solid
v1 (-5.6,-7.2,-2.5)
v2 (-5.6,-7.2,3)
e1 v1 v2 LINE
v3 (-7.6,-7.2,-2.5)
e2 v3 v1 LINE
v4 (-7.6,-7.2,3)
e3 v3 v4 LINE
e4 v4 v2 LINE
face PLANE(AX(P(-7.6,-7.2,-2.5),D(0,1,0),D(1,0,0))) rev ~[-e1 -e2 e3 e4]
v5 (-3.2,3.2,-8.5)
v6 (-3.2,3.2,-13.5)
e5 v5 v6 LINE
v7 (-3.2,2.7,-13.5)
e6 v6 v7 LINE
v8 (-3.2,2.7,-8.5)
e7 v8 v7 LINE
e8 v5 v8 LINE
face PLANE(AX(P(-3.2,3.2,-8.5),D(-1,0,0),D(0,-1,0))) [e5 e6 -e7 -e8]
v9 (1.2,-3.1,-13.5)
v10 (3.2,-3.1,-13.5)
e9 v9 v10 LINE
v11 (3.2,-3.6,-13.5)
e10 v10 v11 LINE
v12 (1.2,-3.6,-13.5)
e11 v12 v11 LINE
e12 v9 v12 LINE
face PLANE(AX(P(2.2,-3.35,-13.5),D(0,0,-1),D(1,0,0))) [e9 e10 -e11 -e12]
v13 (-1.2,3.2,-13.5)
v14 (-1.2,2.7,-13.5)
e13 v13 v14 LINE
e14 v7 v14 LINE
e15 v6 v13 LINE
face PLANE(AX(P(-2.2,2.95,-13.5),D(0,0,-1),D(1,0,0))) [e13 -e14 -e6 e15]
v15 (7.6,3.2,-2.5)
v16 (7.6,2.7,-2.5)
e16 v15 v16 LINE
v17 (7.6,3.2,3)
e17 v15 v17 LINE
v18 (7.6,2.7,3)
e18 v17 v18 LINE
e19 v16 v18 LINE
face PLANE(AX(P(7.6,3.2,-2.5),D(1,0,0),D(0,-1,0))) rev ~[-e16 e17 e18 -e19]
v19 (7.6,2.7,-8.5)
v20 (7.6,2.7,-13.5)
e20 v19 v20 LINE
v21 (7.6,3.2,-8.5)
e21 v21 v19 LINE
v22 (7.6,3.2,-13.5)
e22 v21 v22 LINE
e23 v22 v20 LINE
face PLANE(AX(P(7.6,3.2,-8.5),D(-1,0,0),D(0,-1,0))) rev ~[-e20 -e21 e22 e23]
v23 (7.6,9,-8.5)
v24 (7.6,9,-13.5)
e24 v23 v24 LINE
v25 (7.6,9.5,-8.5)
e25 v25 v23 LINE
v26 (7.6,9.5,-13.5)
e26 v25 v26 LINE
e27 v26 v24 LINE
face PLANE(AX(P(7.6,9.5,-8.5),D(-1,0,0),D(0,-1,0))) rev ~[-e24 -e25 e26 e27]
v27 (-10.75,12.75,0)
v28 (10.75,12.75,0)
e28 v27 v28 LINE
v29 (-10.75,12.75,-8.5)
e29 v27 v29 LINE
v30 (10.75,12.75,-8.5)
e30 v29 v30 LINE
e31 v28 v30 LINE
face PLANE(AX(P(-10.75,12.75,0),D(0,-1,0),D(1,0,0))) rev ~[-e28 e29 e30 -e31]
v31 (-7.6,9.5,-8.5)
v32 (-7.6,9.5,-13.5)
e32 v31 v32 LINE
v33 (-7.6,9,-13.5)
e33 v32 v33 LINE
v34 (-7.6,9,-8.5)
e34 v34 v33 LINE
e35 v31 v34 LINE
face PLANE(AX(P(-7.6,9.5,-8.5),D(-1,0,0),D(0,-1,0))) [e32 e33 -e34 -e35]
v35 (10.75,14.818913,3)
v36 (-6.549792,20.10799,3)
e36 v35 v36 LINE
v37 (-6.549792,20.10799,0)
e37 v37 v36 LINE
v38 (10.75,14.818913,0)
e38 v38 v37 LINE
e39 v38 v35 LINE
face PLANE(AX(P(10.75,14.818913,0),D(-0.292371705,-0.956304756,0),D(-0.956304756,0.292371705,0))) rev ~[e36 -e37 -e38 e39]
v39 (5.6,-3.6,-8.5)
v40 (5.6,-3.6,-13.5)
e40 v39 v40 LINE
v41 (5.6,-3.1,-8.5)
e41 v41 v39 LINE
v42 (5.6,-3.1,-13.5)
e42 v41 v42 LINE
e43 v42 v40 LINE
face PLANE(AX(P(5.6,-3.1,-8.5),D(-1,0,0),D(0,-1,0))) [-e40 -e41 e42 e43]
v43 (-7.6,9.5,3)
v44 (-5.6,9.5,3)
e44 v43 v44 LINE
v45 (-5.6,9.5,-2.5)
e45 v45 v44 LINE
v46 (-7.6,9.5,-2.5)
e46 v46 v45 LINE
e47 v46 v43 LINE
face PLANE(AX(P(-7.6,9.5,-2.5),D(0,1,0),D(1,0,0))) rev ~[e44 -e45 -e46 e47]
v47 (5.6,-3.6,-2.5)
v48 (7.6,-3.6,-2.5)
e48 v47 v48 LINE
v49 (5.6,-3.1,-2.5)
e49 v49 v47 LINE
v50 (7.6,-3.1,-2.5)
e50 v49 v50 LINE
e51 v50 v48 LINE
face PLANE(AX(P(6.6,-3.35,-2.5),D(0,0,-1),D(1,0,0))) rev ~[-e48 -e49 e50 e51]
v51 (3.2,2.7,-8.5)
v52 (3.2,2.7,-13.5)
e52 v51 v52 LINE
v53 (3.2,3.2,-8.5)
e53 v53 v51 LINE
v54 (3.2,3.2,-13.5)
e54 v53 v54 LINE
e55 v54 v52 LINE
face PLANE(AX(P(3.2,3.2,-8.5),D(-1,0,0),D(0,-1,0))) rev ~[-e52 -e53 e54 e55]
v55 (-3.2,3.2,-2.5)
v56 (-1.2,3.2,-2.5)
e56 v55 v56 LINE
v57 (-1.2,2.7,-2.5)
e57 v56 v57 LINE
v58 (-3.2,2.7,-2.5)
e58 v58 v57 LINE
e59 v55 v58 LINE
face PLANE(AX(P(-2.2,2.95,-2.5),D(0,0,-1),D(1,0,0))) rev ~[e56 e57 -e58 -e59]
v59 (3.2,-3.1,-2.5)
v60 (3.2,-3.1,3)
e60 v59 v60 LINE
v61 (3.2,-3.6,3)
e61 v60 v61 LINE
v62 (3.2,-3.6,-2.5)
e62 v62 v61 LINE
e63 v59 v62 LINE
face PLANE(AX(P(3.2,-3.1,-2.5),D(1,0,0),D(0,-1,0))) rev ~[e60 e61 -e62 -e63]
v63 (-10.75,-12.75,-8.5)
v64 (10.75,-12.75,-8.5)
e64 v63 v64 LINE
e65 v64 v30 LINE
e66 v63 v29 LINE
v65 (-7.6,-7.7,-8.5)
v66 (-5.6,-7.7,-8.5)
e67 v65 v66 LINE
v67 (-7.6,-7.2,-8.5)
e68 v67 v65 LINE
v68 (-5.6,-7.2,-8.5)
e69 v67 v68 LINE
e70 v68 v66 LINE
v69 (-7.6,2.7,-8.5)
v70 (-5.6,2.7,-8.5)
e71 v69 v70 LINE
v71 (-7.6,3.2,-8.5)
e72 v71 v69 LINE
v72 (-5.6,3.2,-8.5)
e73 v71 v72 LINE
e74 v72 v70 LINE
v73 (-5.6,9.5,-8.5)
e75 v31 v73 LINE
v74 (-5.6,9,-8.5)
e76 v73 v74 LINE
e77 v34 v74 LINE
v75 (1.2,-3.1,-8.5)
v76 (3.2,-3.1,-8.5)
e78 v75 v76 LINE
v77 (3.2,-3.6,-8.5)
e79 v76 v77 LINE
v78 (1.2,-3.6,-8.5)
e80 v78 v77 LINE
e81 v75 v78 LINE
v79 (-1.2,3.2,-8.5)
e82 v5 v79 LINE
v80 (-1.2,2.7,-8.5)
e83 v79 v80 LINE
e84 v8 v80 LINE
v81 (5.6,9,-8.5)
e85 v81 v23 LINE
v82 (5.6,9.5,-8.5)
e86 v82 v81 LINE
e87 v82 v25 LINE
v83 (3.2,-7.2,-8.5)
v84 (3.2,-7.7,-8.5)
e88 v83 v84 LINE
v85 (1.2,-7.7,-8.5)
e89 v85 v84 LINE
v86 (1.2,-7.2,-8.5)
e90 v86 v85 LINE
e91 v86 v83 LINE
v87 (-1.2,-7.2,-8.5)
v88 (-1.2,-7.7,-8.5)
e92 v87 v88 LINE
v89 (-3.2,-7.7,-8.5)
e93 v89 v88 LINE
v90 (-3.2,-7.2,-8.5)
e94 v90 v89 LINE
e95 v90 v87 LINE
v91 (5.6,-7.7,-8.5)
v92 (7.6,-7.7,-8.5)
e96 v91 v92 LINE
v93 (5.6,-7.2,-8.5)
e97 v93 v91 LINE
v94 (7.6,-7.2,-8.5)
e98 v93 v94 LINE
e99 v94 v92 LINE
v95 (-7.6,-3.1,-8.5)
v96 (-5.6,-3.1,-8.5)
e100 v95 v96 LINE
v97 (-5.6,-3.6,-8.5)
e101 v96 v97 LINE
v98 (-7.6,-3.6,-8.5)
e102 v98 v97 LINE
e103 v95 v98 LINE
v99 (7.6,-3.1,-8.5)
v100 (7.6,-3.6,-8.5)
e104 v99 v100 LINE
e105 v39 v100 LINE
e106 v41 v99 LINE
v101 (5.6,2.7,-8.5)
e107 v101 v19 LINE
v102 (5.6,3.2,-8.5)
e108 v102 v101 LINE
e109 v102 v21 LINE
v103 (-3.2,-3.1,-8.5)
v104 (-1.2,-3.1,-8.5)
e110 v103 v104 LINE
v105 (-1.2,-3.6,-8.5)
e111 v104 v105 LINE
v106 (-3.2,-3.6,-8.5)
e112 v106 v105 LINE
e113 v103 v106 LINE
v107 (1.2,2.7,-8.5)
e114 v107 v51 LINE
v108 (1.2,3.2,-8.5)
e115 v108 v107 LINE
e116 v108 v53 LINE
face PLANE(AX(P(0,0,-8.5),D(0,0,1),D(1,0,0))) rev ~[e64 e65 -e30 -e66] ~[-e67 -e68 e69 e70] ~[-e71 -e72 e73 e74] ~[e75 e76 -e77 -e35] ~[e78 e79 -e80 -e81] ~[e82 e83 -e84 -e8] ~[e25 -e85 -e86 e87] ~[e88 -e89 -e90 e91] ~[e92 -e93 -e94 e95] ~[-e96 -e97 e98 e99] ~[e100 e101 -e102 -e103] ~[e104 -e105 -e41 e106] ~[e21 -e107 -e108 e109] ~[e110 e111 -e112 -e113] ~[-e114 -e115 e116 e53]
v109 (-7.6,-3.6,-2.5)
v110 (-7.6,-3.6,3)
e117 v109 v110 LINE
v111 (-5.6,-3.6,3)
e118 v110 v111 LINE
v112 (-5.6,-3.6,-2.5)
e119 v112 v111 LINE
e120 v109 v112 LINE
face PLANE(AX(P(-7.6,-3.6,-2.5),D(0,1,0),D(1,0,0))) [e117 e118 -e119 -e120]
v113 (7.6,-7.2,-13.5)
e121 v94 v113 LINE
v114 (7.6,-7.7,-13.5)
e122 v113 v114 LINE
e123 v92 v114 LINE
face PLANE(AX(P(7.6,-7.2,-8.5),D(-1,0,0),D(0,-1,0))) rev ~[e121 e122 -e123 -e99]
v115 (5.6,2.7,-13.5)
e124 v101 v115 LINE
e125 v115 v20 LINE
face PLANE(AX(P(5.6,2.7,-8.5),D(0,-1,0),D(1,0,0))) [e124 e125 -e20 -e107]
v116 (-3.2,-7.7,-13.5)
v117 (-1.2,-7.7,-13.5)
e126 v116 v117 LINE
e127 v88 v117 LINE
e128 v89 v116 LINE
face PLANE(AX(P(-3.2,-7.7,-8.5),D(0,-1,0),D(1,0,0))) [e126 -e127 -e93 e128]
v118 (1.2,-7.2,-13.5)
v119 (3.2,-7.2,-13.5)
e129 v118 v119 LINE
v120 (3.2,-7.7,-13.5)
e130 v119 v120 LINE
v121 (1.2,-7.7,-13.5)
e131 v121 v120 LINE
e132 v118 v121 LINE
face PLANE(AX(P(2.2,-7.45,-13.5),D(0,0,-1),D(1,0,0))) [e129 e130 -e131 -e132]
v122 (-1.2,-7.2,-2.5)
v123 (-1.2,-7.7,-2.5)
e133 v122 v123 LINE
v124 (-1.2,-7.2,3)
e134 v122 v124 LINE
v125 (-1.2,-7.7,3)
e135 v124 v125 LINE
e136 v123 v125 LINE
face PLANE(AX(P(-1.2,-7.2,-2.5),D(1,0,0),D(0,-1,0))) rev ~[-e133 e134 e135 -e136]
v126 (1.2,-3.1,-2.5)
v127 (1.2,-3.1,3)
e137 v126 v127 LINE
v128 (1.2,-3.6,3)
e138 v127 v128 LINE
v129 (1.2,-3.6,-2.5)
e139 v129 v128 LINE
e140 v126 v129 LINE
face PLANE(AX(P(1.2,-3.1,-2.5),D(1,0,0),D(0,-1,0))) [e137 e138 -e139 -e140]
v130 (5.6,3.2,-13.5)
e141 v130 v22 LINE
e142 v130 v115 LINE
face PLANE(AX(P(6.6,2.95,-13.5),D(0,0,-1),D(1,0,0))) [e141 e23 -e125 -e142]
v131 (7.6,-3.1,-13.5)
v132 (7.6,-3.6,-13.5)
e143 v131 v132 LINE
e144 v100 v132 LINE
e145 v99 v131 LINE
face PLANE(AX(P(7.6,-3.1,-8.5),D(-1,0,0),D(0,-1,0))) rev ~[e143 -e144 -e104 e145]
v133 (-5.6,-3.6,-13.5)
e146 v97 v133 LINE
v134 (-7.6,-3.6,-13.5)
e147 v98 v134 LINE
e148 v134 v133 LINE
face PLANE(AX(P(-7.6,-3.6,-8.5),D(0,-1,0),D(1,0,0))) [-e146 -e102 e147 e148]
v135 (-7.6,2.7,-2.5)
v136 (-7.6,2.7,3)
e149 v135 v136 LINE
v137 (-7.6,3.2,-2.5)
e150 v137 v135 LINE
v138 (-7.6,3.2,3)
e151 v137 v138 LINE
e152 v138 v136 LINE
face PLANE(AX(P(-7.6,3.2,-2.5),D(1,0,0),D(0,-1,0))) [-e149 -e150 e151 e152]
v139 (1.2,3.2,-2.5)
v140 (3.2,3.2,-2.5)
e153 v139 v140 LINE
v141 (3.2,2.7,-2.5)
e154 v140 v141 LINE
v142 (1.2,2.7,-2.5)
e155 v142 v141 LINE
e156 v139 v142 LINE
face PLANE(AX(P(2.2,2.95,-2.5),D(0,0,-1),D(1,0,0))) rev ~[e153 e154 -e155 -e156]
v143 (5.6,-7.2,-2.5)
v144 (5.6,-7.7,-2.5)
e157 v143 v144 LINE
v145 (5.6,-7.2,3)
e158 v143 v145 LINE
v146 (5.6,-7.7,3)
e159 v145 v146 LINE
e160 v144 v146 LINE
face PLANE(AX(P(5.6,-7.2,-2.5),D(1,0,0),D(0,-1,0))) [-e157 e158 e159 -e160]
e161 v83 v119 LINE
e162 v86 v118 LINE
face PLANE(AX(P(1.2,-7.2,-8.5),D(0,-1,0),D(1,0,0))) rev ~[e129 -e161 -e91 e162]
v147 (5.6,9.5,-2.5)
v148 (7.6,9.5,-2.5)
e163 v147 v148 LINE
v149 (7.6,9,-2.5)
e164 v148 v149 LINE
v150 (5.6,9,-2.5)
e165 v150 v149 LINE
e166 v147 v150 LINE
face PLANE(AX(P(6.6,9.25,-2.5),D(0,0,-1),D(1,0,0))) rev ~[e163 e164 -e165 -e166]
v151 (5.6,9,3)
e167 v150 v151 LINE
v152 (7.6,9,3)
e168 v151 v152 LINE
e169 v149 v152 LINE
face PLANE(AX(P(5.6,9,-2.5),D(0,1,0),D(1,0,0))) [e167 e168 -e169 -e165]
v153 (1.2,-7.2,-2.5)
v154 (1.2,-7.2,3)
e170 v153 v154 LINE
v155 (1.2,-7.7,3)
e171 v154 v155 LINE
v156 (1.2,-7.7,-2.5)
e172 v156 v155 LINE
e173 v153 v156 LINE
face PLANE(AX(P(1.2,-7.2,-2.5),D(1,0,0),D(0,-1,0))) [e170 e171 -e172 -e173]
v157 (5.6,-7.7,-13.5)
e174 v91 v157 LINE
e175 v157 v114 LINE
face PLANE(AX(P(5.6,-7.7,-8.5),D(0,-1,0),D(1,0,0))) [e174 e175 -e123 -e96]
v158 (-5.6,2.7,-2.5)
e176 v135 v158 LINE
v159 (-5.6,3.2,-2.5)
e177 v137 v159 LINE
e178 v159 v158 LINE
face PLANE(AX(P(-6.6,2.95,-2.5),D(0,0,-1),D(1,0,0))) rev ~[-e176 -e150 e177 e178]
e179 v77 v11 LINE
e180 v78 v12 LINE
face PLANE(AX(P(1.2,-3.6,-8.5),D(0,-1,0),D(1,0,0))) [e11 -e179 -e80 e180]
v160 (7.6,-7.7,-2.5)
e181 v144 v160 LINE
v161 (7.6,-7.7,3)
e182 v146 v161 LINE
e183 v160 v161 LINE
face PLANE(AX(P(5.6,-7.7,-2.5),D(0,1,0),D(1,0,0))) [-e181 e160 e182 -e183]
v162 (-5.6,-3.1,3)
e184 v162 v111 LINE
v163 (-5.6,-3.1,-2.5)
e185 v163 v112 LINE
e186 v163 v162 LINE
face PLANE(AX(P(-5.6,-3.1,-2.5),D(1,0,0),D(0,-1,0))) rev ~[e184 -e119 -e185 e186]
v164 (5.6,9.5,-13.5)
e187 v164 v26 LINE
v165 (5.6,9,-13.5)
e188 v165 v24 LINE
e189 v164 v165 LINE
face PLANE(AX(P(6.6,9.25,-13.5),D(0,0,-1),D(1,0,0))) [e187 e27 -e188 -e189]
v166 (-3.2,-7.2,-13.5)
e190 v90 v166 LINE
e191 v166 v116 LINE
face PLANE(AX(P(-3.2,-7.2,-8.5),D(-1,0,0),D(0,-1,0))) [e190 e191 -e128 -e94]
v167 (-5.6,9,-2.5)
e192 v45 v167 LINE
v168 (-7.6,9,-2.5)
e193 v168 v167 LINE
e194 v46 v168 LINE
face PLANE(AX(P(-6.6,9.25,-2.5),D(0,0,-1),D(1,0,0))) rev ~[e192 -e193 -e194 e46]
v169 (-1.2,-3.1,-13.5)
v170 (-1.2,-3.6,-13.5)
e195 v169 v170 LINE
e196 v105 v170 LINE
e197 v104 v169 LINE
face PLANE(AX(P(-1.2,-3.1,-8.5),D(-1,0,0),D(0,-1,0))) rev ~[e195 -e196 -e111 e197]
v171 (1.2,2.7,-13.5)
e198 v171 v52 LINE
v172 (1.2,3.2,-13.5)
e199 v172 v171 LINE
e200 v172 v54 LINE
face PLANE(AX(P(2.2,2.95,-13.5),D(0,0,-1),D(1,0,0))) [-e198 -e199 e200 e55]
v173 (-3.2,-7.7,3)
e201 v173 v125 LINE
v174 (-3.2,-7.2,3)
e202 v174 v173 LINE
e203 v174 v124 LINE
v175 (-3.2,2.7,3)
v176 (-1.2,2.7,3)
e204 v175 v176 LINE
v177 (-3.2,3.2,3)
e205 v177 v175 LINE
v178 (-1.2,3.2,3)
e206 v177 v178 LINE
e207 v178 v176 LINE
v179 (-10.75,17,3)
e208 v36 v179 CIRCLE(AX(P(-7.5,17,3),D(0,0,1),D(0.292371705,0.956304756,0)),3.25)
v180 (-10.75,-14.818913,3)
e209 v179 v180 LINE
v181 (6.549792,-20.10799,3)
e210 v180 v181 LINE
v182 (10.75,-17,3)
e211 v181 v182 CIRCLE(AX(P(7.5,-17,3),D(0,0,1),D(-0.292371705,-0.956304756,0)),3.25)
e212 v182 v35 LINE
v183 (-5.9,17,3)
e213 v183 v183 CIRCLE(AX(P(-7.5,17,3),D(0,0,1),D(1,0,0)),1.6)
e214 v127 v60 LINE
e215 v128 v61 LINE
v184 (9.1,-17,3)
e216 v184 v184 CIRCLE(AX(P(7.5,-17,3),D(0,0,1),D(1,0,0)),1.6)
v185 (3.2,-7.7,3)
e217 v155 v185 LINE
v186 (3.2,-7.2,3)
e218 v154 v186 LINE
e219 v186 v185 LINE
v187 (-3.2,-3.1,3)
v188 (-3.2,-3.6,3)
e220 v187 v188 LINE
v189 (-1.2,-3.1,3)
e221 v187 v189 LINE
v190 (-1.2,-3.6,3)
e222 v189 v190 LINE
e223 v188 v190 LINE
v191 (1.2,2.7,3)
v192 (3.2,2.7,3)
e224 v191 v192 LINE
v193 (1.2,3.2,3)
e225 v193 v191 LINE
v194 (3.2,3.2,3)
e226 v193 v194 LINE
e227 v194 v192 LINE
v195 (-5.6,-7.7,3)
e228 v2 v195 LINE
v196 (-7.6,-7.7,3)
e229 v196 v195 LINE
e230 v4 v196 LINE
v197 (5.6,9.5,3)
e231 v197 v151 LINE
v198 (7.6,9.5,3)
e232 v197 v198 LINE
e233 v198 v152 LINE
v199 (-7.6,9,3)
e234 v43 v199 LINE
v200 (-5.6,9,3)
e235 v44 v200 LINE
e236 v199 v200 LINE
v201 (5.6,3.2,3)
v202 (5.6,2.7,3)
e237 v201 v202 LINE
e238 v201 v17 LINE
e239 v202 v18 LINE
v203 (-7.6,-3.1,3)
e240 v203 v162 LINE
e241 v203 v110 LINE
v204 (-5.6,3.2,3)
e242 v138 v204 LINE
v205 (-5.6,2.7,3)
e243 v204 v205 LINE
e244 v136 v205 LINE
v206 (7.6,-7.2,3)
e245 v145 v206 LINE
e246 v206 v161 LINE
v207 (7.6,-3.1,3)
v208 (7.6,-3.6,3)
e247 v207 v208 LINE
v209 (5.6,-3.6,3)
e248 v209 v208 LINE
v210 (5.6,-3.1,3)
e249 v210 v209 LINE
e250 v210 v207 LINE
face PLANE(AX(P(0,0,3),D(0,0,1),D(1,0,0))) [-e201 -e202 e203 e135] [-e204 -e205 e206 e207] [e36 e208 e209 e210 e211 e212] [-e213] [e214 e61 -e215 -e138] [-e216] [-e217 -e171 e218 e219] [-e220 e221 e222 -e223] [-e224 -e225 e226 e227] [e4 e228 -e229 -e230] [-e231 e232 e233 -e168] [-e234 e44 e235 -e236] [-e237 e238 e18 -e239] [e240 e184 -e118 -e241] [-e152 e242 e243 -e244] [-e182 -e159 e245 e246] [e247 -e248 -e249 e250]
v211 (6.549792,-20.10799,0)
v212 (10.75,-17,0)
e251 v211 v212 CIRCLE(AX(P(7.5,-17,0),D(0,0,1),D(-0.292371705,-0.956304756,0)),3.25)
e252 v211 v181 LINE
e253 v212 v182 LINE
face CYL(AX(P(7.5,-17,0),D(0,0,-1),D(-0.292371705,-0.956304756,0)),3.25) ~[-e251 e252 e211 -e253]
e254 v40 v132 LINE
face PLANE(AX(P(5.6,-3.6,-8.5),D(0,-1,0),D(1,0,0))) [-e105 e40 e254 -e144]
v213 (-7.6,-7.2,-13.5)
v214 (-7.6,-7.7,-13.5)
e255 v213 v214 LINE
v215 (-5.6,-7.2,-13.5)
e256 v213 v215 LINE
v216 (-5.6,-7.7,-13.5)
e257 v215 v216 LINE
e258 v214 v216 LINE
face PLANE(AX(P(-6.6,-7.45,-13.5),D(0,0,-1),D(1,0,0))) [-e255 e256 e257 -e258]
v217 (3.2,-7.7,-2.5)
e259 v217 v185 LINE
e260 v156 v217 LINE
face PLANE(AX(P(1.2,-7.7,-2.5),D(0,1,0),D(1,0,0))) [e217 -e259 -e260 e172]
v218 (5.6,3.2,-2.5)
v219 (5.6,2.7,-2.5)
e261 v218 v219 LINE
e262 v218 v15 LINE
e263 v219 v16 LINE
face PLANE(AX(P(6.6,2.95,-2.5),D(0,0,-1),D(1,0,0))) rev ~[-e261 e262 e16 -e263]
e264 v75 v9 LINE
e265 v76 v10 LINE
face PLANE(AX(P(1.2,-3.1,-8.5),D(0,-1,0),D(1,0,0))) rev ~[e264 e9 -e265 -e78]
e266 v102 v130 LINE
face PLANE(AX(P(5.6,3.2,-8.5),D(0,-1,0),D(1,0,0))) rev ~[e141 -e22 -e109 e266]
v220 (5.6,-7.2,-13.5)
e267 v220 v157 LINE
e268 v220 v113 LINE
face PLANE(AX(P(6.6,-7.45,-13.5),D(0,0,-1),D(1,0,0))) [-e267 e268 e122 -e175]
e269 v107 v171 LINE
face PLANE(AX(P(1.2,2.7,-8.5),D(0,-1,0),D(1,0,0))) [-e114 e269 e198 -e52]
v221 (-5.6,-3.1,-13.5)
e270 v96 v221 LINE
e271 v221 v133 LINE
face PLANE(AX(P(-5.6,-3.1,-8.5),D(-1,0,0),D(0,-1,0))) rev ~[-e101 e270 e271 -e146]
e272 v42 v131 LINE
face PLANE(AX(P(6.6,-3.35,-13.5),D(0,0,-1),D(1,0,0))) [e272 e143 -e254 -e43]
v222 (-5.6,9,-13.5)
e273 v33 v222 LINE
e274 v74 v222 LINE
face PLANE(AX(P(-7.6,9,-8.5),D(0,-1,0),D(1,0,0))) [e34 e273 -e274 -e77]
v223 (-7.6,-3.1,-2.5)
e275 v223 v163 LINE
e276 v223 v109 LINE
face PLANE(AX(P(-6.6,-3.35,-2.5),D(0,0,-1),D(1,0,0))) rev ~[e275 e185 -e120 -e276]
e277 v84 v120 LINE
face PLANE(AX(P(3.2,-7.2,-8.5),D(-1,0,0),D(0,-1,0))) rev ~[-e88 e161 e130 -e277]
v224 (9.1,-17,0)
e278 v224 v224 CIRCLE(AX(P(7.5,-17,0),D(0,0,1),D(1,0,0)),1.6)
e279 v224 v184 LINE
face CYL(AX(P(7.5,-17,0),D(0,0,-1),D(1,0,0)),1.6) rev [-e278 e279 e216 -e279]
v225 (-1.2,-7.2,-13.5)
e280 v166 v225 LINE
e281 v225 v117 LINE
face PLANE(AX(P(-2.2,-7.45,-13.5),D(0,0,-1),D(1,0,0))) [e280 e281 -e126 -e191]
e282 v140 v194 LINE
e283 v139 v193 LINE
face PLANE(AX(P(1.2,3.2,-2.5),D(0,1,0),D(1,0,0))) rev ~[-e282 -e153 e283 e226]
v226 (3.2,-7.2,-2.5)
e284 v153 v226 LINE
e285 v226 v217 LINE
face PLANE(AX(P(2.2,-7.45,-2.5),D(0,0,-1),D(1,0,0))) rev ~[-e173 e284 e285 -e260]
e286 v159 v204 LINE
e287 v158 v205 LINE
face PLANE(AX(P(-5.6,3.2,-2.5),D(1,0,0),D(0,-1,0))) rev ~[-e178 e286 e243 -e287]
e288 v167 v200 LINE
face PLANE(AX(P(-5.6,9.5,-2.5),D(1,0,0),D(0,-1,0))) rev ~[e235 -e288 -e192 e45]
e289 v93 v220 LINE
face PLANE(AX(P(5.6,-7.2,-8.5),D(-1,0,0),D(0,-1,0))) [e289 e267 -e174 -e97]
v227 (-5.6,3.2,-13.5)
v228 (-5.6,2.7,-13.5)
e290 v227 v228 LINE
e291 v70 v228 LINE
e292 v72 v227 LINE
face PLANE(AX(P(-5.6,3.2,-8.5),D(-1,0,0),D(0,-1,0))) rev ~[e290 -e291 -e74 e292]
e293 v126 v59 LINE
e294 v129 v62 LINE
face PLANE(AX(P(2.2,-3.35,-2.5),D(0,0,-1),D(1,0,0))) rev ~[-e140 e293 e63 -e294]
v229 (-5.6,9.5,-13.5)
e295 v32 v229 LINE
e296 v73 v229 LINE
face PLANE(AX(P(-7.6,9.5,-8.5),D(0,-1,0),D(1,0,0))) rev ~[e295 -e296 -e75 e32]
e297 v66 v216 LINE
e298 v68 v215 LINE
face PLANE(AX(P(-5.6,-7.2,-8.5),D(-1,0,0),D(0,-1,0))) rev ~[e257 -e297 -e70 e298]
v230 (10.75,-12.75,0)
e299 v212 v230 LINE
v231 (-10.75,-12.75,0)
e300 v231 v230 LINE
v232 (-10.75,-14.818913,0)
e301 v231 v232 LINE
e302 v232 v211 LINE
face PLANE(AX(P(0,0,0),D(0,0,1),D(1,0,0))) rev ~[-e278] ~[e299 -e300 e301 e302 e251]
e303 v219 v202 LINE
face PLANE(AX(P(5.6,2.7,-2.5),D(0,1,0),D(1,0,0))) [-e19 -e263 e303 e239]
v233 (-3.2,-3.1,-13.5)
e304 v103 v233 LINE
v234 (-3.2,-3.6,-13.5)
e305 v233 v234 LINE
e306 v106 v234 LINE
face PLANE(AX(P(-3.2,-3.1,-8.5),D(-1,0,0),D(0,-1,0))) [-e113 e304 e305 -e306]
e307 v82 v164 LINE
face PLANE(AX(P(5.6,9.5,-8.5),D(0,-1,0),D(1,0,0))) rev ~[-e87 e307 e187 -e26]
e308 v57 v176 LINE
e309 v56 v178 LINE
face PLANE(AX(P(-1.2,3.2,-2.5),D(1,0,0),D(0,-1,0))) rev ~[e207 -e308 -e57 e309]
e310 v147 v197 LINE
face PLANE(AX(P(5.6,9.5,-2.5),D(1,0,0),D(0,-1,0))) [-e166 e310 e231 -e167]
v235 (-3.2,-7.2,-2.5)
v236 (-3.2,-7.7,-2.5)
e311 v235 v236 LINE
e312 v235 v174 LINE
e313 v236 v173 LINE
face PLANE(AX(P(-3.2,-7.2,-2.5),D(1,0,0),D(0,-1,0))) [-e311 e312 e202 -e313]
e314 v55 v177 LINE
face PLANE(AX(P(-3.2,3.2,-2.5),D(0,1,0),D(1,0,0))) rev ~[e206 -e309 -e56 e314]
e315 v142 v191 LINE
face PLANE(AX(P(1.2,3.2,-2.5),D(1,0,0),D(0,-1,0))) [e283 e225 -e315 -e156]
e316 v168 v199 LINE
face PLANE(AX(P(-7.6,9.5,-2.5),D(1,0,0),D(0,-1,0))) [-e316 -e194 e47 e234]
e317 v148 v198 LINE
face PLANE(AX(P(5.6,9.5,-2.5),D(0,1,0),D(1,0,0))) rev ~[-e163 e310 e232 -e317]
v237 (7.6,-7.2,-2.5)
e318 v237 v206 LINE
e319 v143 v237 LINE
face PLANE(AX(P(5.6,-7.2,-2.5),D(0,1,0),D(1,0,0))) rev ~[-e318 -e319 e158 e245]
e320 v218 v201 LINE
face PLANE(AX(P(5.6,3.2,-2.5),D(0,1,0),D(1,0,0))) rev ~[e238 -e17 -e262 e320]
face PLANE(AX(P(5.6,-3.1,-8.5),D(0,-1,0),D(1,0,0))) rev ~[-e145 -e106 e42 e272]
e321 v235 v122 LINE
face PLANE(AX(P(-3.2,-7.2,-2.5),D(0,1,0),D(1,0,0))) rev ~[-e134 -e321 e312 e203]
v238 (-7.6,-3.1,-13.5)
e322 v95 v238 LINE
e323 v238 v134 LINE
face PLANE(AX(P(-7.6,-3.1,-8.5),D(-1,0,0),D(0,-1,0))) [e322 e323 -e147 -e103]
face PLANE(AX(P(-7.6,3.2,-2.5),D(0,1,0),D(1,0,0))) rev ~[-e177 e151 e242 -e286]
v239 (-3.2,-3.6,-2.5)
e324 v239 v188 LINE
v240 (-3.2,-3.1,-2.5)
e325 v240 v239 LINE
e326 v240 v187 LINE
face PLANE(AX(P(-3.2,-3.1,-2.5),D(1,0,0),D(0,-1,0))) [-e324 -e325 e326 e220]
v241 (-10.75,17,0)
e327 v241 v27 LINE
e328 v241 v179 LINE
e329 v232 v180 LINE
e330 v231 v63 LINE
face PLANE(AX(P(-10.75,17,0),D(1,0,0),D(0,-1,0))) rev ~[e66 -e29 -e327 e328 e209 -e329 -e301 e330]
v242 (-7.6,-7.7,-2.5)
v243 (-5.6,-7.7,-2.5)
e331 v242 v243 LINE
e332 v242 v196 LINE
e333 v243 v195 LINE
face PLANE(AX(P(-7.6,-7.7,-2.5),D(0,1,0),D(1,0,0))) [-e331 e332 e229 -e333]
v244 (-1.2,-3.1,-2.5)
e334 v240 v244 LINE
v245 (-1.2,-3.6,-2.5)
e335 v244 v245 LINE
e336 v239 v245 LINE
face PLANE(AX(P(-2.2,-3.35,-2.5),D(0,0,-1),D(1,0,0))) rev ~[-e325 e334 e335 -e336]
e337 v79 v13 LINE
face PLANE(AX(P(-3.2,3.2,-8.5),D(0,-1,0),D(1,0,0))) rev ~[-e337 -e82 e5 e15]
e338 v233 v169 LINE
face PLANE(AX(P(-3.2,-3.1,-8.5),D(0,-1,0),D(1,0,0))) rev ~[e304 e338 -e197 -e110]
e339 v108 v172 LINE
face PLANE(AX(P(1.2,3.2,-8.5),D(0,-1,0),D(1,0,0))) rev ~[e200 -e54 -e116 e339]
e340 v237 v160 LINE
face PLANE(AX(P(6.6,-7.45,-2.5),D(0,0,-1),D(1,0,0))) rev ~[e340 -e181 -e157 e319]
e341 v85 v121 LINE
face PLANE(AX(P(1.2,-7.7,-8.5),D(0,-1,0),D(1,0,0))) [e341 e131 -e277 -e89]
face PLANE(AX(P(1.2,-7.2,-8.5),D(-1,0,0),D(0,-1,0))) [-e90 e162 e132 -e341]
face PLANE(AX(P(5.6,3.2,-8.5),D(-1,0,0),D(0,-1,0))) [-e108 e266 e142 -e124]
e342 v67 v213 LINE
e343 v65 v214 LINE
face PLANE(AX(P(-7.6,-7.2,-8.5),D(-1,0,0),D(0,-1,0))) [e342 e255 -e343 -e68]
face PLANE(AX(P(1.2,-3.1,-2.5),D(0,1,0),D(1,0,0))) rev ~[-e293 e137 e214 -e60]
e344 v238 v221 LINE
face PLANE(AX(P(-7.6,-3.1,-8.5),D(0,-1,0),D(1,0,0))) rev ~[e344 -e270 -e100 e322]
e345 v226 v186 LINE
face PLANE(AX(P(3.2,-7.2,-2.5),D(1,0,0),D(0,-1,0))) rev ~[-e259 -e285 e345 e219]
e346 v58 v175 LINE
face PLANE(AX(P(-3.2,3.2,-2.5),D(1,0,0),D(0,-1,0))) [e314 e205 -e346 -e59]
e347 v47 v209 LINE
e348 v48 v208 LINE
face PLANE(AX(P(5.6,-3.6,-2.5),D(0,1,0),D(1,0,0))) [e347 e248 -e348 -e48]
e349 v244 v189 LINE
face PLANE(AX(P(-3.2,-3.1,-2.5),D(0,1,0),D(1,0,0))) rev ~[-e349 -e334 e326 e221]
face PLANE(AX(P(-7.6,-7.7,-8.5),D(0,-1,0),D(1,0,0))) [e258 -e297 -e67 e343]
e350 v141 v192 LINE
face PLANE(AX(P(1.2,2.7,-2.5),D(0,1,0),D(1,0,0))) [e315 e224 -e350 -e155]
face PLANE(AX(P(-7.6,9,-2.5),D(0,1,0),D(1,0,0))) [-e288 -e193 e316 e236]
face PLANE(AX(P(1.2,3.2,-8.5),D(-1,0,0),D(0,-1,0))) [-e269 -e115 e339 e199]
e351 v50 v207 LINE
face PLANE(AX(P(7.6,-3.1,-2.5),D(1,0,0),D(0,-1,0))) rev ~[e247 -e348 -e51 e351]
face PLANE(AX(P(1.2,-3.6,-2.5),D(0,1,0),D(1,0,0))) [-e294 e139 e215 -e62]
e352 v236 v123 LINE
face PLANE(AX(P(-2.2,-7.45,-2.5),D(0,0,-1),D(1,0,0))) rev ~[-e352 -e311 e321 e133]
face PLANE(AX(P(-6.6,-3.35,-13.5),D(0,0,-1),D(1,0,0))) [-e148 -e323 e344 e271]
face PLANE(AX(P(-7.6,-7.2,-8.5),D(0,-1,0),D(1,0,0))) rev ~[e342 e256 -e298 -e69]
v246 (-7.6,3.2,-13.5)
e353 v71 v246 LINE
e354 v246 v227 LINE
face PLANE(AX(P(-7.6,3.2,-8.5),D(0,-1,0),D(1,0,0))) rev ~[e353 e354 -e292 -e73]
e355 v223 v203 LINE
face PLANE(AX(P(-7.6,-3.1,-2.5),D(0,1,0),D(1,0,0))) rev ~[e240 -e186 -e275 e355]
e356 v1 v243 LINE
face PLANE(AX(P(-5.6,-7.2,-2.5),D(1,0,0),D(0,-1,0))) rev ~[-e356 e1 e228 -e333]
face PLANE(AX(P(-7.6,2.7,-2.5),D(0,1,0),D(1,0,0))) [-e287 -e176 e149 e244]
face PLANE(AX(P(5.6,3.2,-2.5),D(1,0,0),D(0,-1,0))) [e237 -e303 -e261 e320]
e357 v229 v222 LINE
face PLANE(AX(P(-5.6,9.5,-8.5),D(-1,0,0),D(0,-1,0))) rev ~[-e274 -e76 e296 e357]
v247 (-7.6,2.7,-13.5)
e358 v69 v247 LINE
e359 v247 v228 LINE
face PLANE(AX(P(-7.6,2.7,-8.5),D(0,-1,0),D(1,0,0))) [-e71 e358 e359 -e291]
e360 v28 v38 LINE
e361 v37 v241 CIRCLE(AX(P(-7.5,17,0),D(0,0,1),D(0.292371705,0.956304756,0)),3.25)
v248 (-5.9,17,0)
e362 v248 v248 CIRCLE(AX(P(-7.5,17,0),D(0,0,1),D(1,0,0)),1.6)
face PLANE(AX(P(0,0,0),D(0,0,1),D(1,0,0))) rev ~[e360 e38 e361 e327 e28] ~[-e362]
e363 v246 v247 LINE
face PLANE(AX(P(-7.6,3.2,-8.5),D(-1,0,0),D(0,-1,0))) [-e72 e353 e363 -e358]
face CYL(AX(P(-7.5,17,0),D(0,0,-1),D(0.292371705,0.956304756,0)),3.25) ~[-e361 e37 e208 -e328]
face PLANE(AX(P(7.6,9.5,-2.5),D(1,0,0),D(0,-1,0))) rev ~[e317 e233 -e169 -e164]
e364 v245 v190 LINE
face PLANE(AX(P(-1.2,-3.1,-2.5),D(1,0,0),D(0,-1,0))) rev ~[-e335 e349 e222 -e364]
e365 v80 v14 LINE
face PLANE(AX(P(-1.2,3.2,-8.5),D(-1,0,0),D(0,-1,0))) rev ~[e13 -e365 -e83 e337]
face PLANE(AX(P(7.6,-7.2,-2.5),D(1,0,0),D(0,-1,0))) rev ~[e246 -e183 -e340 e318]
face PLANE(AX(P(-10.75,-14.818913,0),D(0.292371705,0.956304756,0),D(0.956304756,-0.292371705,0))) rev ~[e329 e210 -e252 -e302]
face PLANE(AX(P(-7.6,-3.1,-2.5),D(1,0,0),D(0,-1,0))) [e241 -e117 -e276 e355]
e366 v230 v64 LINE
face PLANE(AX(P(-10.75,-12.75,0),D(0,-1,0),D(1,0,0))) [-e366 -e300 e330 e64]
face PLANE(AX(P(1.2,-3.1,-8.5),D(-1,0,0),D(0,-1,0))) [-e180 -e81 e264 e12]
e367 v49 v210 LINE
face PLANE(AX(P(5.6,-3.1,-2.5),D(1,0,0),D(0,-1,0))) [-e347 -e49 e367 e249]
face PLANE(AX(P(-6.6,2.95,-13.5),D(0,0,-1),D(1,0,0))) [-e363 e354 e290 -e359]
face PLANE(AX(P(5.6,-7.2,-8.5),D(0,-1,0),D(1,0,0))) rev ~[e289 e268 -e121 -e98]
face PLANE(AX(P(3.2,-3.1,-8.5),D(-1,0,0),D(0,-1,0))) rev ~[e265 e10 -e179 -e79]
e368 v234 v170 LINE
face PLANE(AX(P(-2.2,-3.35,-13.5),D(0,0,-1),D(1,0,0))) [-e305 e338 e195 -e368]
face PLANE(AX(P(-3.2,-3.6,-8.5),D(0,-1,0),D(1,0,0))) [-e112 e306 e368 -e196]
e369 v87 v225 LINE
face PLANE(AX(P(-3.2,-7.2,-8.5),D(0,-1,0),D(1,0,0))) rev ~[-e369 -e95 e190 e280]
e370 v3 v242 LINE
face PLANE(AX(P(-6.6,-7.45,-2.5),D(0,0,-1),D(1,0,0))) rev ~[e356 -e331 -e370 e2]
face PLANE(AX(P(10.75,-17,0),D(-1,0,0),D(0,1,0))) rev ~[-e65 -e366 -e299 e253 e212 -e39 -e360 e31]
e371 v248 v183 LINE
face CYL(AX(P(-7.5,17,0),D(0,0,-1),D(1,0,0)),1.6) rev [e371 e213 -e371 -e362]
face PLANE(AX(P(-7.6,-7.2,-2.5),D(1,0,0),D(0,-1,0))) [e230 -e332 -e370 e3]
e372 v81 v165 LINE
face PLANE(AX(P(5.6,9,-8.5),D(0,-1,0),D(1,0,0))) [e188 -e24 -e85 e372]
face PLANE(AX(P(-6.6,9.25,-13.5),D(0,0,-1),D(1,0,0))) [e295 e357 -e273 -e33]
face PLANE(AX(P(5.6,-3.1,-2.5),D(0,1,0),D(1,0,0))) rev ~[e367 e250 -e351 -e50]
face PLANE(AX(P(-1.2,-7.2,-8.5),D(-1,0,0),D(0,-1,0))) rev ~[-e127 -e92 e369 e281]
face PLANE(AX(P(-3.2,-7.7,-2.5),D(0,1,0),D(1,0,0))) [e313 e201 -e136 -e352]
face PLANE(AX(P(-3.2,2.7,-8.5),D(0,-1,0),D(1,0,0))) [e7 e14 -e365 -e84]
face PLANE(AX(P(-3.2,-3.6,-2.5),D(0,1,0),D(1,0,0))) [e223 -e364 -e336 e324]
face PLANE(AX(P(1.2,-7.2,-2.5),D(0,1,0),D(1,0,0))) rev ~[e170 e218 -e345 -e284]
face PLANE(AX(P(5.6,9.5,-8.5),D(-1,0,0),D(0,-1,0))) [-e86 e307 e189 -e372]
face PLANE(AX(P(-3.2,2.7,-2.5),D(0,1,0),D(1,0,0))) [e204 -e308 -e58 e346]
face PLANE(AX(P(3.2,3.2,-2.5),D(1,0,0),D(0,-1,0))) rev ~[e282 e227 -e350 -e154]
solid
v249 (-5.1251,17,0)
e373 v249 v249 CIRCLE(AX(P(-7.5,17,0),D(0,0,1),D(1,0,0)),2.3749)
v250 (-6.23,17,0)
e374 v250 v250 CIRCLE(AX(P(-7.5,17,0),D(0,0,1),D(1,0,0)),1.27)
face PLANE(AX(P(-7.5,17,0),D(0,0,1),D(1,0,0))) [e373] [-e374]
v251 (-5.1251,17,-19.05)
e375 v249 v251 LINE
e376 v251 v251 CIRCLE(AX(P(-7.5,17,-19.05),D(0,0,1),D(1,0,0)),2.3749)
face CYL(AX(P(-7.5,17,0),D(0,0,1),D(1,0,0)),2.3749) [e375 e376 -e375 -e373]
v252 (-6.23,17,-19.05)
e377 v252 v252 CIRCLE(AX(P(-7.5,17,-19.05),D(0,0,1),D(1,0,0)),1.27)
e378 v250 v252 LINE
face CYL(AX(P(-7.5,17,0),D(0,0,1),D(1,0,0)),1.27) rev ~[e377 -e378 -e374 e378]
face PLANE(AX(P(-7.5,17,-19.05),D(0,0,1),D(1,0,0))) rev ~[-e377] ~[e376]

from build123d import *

# Parameters (mm, degrees)
F0_R     = 1.6
F1_DEPTH = 3
F2_W     = 21.5
F2_H     = 25.5
F3_DEPTH = 8.5
F4_W     = 2
F4_H     = 0.5
F5_DEPTH = 5
F6_START = -6
F6_DEPTH = 5.5
F7_R     = 2.3749
F7_R_2   = 1.27
F8_DEPTH = 19.05


with BuildPart() as f1:
    # F0 (on Top) → F1 (new body)
    with BuildSketch(Plane.XY):
        with BuildLine():
            ThreePointArc((-6.5497919597, 20.1079904569), (-9.4331740569, 19.612534797), (-10.75, 17))
            Line((-10.75, 17), (-10.75, -14.818913272))
            Line((-10.75, -14.818913272), (6.5497919597, -20.1079904569))
            ThreePointArc((6.5497919597, -20.1079904569), (9.4331740569, -19.612534797), (10.75, -17))
            Line((10.75, -17), (10.75, 14.818913272))
            Line((10.75, 14.818913272), (-6.5497919597, 20.1079904569))
        make_face()
        with Locations((7.5, -17)):
            Circle(F0_R, mode=Mode.SUBTRACT)
        with Locations((-7.5, 17)):
            Circle(F0_R, mode=Mode.SUBTRACT)
    extrude(amount=F1_DEPTH)

    # F2 (on Top) → F3 (join)
    with BuildSketch(Plane.XY):
        Rectangle(F2_W, F2_H)
    extrude(amount=-F3_DEPTH)

    # F4 (on face) → F5 (join)
    with BuildSketch(Plane(origin=(0, 0, -8.5), x_dir=(1, 0, 0), z_dir=(0, 0, -1))):
        with Locations((-6.6, 7.45)):
            Rectangle(F4_W, F4_H)
        with Locations((-2.2, 7.45)):
            Rectangle(F4_W, F4_H)
        with Locations((2.2, 7.45)):
            Rectangle(F4_W, F4_H)
        with Locations((6.6, 7.45)):
            Rectangle(F4_W, F4_H)
        with Locations((6.6, 3.35)):
            Rectangle(F4_W, F4_H)
        with Locations((-6.6, 3.35)):
            Rectangle(F4_W, F4_H)
        with Locations((-2.2, 3.35)):
            Rectangle(F4_W, F4_H)
        with Locations((2.2, 3.35)):
            Rectangle(F4_W, F4_H)
        with Locations((2.2, -2.95)):
            Rectangle(F4_W, F4_H)
        with Locations((-2.2, -2.95)):
            Rectangle(F4_W, F4_H)
        with Locations((6.6, -2.95)):
            Rectangle(F4_W, F4_H)
        with Locations((-6.6, -2.95)):
            Rectangle(F4_W, F4_H)
        with Locations((6.6, -9.25)):
            Rectangle(F4_W, F4_H)
        with Locations((-6.6, -9.25)):
            Rectangle(F4_W, F4_H)
    extrude(amount=F5_DEPTH)

    # F4 (on face) → F6 (cut)
    with BuildSketch(Plane(origin=(0, 0, -8.5), x_dir=(1, 0, 0), z_dir=(0, 0, -1)).offset(F6_START)):
        with Locations((-6.6, 7.45)):
            Rectangle(F4_W, F4_H)
        with Locations((-2.2, 7.45)):
            Rectangle(F4_W, F4_H)
        with Locations((2.2, 7.45)):
            Rectangle(F4_W, F4_H)
        with Locations((6.6, 7.45)):
            Rectangle(F4_W, F4_H)
        with Locations((6.6, 3.35)):
            Rectangle(F4_W, F4_H)
        with Locations((-6.6, 3.35)):
            Rectangle(F4_W, F4_H)
        with Locations((-2.2, 3.35)):
            Rectangle(F4_W, F4_H)
        with Locations((2.2, 3.35)):
            Rectangle(F4_W, F4_H)
        with Locations((2.2, -2.95)):
            Rectangle(F4_W, F4_H)
        with Locations((-2.2, -2.95)):
            Rectangle(F4_W, F4_H)
        with Locations((6.6, -2.95)):
            Rectangle(F4_W, F4_H)
        with Locations((-6.6, -2.95)):
            Rectangle(F4_W, F4_H)
        with Locations((6.6, -9.25)):
            Rectangle(F4_W, F4_H)
        with Locations((-6.6, -9.25)):
            Rectangle(F4_W, F4_H)
    extrude(amount=-F6_DEPTH, mode=Mode.SUBTRACT)


with BuildPart() as f8:
    # F7 (on Top) → F8 (new body)
    with BuildSketch(Plane.XY):
        with Locations((-7.5, 17)):
            Circle(F7_R)
        with Locations((-7.5, 17)):
            Circle(F7_R_2, mode=Mode.SUBTRACT)
    extrude(amount=-F8_DEPTH)


solid = Compound([f1.part, f8.part])
